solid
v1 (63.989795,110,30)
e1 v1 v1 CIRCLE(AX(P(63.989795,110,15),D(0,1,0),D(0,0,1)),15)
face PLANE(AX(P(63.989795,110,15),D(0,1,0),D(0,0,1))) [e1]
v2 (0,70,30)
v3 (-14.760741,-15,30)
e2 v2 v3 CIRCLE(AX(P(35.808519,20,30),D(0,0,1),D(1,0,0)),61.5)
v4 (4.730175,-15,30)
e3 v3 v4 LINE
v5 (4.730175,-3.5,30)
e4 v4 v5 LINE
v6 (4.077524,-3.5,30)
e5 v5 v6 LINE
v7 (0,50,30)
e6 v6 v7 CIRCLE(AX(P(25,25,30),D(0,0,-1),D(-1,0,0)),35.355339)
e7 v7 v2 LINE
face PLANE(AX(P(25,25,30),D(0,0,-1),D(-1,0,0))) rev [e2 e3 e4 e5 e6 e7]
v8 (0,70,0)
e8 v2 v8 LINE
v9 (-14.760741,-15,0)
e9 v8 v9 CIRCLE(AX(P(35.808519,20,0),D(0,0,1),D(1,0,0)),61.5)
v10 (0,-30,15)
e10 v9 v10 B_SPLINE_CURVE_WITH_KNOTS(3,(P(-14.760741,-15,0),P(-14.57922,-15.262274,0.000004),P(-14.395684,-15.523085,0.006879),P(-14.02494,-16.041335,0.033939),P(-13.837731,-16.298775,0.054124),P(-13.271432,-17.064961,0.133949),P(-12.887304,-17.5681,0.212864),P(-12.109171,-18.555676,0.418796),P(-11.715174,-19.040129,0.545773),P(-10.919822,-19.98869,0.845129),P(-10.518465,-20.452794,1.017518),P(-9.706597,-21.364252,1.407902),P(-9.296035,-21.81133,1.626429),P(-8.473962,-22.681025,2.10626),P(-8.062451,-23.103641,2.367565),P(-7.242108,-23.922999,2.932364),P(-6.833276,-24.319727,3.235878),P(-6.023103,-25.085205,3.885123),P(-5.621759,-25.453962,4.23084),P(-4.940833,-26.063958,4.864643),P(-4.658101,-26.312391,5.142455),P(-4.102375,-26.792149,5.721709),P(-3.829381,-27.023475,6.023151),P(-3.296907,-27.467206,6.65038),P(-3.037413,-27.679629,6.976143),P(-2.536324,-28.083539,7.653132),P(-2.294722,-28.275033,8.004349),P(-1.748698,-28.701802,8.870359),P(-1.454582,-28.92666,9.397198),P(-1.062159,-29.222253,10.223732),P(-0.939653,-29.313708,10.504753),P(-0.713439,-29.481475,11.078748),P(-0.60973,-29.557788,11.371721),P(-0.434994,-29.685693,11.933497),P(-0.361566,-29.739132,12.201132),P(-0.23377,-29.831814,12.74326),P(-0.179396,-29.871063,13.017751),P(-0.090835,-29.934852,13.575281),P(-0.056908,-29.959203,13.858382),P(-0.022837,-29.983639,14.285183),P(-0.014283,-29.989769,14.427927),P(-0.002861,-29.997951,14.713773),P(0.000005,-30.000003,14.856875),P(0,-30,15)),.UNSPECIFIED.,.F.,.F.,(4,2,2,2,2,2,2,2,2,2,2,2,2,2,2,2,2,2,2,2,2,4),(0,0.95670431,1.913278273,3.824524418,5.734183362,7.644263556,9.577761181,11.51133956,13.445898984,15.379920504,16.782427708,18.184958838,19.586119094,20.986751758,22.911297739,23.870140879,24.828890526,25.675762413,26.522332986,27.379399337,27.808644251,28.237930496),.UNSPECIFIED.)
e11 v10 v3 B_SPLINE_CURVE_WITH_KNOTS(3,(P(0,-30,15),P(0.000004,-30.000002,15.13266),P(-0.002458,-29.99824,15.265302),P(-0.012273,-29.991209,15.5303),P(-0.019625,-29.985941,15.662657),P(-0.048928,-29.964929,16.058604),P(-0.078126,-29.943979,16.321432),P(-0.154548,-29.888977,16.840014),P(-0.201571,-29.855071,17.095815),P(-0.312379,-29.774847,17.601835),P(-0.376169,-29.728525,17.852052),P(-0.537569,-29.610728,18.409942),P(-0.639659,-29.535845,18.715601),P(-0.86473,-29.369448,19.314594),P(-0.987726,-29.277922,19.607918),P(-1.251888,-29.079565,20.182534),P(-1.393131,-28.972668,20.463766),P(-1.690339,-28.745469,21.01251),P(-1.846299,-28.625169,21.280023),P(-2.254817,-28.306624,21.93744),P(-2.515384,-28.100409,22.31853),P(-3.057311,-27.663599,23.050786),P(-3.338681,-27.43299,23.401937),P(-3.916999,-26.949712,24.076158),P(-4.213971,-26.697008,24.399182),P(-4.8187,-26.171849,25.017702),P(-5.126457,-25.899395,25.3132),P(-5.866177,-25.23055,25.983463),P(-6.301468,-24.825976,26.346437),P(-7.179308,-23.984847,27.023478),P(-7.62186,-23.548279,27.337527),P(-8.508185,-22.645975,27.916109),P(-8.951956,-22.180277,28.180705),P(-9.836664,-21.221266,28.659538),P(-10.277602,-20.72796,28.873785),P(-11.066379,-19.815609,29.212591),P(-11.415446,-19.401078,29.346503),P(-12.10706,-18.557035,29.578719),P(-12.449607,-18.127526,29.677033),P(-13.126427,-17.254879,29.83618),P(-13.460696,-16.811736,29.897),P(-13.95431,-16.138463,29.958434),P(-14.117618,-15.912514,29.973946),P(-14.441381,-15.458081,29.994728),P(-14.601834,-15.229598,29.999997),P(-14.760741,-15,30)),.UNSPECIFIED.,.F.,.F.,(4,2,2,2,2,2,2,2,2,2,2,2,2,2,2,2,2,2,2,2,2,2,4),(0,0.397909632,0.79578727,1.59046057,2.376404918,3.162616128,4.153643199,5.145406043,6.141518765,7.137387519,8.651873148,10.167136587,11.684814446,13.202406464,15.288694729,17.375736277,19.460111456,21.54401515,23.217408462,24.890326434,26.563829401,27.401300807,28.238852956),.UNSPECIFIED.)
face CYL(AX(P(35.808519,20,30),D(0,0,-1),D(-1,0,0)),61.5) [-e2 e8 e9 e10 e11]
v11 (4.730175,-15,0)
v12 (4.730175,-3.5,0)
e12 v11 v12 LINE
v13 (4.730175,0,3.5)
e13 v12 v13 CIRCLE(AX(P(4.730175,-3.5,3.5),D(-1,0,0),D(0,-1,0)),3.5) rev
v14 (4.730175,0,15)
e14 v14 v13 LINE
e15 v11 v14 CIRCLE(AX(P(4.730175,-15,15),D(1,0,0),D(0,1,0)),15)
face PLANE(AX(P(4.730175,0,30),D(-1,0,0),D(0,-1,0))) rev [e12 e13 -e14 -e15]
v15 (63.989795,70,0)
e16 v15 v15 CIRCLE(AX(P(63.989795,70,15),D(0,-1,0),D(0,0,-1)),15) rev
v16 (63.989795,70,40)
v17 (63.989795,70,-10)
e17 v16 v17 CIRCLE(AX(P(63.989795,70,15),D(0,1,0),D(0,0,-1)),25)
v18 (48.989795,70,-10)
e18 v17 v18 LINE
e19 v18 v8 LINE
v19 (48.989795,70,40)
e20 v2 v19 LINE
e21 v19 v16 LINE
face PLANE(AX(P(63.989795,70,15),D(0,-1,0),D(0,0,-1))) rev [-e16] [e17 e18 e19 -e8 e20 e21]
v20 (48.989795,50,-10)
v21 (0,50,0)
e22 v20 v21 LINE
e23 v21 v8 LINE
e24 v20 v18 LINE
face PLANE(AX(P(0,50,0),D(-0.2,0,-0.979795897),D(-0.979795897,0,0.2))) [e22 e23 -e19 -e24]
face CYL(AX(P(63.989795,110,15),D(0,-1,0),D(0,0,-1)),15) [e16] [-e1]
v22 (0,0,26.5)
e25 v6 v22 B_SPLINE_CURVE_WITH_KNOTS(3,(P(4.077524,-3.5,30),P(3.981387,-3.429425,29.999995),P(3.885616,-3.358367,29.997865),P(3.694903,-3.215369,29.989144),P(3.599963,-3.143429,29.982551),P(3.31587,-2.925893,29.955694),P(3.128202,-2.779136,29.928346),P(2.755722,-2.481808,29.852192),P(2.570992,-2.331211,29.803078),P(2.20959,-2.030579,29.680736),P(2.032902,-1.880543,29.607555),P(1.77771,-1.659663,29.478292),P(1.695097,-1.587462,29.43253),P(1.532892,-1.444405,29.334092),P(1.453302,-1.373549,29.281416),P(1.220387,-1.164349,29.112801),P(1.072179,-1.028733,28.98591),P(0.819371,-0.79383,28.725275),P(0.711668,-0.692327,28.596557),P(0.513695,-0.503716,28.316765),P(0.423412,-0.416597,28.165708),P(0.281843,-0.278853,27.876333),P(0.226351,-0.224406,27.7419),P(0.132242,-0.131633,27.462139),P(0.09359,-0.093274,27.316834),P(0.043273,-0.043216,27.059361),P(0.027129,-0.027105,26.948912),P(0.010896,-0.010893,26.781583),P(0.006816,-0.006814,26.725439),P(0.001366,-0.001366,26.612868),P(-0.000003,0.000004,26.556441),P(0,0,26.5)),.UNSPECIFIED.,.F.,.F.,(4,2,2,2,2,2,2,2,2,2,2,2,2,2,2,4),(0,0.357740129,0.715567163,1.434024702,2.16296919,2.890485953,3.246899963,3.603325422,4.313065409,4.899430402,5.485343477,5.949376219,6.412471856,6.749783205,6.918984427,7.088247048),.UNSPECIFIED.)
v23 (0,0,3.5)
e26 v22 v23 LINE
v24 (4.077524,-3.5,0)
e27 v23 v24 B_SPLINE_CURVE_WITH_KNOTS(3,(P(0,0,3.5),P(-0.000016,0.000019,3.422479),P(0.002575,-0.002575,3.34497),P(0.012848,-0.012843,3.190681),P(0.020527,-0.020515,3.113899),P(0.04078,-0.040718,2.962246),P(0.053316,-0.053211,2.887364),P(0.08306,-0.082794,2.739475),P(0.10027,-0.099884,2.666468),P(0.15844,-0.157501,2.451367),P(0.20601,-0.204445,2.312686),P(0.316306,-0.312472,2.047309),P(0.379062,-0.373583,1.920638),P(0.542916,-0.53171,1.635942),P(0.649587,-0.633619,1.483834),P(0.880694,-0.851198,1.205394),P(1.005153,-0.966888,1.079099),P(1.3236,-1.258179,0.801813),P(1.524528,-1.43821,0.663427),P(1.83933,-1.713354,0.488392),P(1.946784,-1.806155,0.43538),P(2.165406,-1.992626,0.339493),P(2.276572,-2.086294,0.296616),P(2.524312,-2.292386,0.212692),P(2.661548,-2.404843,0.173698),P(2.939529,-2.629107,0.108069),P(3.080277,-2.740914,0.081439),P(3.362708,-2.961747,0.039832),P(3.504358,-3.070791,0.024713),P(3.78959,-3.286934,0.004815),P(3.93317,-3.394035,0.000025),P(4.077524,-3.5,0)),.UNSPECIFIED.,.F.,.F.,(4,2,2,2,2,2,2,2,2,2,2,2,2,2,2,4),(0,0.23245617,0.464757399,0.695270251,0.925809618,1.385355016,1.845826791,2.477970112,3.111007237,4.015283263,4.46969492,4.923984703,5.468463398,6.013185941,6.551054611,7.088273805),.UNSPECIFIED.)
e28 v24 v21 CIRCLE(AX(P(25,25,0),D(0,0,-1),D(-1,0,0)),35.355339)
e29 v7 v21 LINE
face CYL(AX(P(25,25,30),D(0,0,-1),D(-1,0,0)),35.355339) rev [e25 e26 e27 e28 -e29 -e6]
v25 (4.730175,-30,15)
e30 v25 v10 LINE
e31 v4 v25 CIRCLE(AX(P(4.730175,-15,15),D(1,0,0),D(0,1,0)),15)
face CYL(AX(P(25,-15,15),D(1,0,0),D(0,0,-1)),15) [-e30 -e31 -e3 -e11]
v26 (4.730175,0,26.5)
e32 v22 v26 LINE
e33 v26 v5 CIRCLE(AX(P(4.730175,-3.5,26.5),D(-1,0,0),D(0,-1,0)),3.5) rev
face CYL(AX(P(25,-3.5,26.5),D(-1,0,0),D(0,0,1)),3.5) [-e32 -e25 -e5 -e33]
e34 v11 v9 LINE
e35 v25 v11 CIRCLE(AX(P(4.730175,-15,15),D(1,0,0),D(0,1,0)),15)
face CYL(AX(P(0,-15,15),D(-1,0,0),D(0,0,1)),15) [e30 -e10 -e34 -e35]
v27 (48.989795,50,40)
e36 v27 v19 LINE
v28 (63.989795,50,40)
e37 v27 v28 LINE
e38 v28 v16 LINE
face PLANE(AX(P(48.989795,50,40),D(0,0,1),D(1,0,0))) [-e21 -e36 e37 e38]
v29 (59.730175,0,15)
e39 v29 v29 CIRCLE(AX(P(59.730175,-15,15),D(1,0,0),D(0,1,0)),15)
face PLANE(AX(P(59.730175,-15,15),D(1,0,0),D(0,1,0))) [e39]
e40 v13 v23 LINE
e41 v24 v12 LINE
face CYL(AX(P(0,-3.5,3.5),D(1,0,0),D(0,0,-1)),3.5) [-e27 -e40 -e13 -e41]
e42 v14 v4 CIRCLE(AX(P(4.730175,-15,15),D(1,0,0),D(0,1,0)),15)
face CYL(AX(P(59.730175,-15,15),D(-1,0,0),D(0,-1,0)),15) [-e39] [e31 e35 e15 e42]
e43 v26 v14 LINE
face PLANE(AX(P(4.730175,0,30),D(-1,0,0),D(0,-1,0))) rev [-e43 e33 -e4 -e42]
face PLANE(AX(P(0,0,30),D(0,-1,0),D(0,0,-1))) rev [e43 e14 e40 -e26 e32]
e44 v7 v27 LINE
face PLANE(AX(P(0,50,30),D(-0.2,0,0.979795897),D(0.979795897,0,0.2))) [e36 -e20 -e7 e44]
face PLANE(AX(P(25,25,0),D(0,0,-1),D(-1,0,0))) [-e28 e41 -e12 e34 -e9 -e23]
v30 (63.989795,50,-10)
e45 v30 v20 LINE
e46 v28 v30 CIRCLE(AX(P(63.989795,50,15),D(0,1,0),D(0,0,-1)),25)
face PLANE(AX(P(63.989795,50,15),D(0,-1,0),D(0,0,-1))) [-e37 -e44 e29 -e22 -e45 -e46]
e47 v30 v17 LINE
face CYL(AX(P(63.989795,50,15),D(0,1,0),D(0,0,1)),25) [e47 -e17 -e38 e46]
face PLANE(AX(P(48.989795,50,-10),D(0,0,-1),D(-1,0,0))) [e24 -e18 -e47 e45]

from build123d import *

# Parameters (mm, degrees)
BOSS_EXTRUDE1_DEPTH = 30
SKETCH2_R           = 15
BOSS_EXTRUDE2_DEPTH = 55
FILLET1_R           = 3.5
FILLET5_R           = 15
BOSS_EXTRUDE3_DEPTH = 20
SKETCH6_R           = 15
BOSS_EXTRUDE4_DEPTH = 40


with BuildPart() as part:
    # Sketch1 → Boss-Extrude1 (new body)
    with BuildSketch(Plane.XY):
        with BuildLine():
            Line((0, 0), (4.730174559, 0))
            Line((4.730174559, 0), (4.730174559, -30))
            Line((4.730174559, -30), (0, -30))
            ThreePointArc((0, -30), (-25.69148146, 20), (0, 70))
            Line((0, 70), (0, 50))
            ThreePointArc((0, 50), (-10.355339059, 25), (0, 0))
        make_face()
    extrude(amount=BOSS_EXTRUDE1_DEPTH)

    # Sketch2 → Boss-Extrude2 (add)
    with BuildSketch(Plane(origin=(4.730174559, 0, 0), x_dir=(0, 0, -1), z_dir=(1, 0, 0))):
        with Locations(Location((-15, -15, 0), (0, 0, 90))):
            Circle(SKETCH2_R)
    extrude(amount=BOSS_EXTRUDE2_DEPTH)

    # Fillet1
    fillet1_edges = [part.edges().sort_by_distance(p)[0] for p in [
        (2.36508728, 0, 30),
        (2.36508728, 0, 0),
    ]]
    fillet(fillet1_edges, radius=FILLET1_R)

    # Fillet5
    fillet5_edges = [part.edges().sort_by_distance(p)[0] for p in [
        (2.36508728, -30, 0),
        (2.36508728, -30, 30),
    ]]
    fillet(fillet5_edges, radius=FILLET5_R - 0.0001)  # a hair under: the kernel refuses the full size

    # Sketch5 → Boss-Extrude3 (add)
    with BuildSketch(Plane(origin=(0, 70, 0), x_dir=(0, 0, -1), z_dir=(0, 1, 0))):
        with BuildLine():
            Line((-30, 0), (-40, -48.989794856))
            Line((-40, -48.989794856), (-40, -63.989794856))
            ThreePointArc((-40, -63.989794856), (-15, -88.989794856), (10, -63.989794856))
            Line((10, -63.989794856), (10, -48.989794856))
            Line((10, -48.989794856), (0, 0))
            Line((0, 0), (-30, 0))
        make_face()
    extrude(amount=-BOSS_EXTRUDE3_DEPTH)

    # Sketch6 → Boss-Extrude4 (add)
    with BuildSketch(Plane(origin=(0, 70, 0), x_dir=(1, 0, 0), z_dir=(0, 1, 0))):
        with Locations(Location((63.989794856, -15, 0), (0, 0, 90))):
            Circle(SKETCH6_R)
    extrude(amount=BOSS_EXTRUDE4_DEPTH)


solid = part.part
